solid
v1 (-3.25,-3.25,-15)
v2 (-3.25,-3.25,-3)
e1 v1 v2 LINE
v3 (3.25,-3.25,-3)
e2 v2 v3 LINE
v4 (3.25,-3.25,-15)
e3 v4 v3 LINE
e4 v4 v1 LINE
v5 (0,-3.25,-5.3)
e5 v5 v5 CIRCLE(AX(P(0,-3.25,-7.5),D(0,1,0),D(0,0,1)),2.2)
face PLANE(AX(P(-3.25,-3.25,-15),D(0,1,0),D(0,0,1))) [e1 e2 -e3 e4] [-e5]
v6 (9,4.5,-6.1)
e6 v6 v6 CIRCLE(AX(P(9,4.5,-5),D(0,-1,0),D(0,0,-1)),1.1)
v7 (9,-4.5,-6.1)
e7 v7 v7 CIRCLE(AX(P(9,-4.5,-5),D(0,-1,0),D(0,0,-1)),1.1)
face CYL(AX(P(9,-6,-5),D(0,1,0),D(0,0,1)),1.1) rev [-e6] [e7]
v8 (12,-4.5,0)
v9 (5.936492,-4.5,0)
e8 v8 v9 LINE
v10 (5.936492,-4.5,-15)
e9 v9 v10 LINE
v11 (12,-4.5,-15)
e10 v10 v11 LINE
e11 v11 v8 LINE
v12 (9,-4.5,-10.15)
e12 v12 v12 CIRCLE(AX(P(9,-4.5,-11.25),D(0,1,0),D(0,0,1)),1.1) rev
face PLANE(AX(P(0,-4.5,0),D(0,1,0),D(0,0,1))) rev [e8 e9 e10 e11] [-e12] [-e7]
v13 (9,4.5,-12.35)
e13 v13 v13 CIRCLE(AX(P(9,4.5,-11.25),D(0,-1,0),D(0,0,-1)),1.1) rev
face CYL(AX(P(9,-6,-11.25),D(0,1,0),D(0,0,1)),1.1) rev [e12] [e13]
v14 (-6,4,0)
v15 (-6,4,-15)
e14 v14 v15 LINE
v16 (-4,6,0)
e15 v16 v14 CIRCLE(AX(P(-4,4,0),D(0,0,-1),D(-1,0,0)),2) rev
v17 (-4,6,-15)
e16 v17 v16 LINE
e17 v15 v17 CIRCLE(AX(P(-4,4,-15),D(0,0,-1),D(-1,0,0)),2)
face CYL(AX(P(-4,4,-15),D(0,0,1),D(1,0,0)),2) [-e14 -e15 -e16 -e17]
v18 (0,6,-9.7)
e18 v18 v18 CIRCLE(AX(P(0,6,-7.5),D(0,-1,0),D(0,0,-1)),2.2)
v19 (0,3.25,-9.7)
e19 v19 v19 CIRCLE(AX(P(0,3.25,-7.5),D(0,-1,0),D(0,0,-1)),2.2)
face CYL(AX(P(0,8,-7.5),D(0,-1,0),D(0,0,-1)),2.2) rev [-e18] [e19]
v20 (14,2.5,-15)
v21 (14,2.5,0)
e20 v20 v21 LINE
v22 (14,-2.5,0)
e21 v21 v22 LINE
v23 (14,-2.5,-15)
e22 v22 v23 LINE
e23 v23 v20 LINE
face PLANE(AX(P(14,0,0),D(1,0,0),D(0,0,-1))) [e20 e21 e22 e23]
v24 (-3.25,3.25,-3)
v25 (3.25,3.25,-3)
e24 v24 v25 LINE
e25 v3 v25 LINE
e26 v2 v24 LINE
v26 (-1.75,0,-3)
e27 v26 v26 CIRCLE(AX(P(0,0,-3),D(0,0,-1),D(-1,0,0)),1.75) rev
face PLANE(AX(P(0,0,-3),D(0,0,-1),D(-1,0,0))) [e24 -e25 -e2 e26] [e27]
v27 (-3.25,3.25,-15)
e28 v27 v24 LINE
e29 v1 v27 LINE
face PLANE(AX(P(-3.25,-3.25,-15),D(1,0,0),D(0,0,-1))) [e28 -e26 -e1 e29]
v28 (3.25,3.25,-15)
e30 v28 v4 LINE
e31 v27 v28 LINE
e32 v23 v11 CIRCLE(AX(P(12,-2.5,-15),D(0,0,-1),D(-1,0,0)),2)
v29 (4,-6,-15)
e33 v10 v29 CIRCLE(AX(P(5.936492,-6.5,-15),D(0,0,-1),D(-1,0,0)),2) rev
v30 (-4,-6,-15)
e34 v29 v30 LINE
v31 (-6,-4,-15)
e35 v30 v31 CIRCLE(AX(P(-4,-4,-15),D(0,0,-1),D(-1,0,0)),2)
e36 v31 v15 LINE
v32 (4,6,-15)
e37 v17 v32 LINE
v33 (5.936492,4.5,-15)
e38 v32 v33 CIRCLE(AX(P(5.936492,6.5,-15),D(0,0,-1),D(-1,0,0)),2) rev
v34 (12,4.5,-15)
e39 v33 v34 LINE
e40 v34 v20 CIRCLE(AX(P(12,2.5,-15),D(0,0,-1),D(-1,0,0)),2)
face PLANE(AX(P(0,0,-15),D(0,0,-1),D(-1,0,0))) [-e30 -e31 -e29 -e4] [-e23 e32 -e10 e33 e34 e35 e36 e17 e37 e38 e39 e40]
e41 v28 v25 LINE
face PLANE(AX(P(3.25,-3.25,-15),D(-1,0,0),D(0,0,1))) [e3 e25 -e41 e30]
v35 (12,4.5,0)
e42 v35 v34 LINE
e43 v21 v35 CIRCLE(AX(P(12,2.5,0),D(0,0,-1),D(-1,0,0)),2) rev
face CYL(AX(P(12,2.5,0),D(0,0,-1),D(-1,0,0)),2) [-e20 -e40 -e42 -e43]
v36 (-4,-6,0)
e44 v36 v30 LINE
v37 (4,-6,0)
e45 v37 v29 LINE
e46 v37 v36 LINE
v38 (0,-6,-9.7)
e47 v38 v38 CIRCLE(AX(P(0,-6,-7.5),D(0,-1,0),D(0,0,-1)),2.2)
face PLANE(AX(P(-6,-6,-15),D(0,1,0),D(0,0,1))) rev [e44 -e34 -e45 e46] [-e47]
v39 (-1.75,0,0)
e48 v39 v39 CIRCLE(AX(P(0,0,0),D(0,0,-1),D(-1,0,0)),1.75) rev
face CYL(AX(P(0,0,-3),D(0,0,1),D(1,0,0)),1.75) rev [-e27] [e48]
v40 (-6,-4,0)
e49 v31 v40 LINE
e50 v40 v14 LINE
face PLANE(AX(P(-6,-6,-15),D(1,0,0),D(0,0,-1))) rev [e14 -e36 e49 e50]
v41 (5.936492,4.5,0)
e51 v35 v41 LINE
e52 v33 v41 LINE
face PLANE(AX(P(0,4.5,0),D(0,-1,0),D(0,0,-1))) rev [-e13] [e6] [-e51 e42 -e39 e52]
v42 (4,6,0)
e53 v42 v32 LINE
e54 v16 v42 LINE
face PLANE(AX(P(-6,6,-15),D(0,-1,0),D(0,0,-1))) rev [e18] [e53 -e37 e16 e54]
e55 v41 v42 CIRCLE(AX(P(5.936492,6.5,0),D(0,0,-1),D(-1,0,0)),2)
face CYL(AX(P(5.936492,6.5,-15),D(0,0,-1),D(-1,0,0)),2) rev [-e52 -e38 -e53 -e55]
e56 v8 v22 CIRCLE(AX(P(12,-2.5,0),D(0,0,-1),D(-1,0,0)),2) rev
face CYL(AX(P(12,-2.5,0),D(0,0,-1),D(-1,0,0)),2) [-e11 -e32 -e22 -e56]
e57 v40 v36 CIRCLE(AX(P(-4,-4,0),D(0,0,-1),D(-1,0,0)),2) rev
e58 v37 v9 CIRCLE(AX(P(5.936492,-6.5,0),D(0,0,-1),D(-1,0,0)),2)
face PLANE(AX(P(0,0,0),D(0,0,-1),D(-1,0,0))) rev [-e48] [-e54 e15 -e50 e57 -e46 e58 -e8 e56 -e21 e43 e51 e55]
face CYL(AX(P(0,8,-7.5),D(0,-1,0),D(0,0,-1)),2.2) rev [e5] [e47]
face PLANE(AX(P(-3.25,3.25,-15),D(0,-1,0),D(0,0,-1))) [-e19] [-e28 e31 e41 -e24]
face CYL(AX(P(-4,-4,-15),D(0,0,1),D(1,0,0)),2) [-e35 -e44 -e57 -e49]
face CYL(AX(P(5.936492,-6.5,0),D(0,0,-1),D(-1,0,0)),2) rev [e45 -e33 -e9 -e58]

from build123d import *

# Parameters (mm, degrees)
SKETCH1_R               = 4.5
SKETCH1_R_2             = 1.25
BOSS_EXTRUDE1_DEPTH     = 8
SKETCH2_R               = 1.75
SKETCH2_R_2             = 1.25
CUT_EXTRUDE1_DEPTH      = 4
SKETCH4_W               = 12
SKETCH4_H               = 12
SKETCH4_W_2             = 6.5
SKETCH4_H_2             = 6.5
BOSS_EXTRUDE2_DEPTH     = 15
SKETCH5_W               = 15
SKETCH5_H               = 12
BOSS_EXTRUDE3_DEPTH     = 8
CUT_EXTRUDE2_DEPTH      = 24.769728648
CUT_EXTRUDE2_DEPTH_BACK = 24.769728648
SKETCH6_R               = 1.1
FILLET1_R               = 2
CUT_EXTRUDE3_START      = -1.5
SKETCH7_W               = 10
SKETCH7_H               = 15
SKETCH7_R               = 1.1
CUT_EXTRUDE3_DEPTH      = 1.5
CUT_EXTRUDE4_START      = -12
SKETCH7_2_W             = 10
SKETCH7_2_H             = 15
SKETCH7_2_R             = 1.1
CUT_EXTRUDE4_DEPTH      = 1.5
FILLET2_R               = 2
SKETCH1_2_R             = 4.5
SKETCH1_2_R_2           = 1.25
CUT_EXTRUDE5_DEPTH      = 8
BOSS_EXTRUDE5_OUTLINE_W = 6.5
BOSS_EXTRUDE5_OUTLINE_H = 6.5
BOSS_EXTRUDE5_OUTLINE_R = 1.75
BOSS_EXTRUDE5_DEPTH     = 3
SKETCH8_R               = 2.2
CUT_EXTRUDE6_DEPTH      = 14


with BuildPart() as part:
    # Sketch1 → Boss-Extrude1 (new body)
    with BuildSketch(Plane.XY):
        Circle(SKETCH1_R)
        Circle(SKETCH1_R_2, mode=Mode.SUBTRACT)
    extrude(amount=BOSS_EXTRUDE1_DEPTH)

    # Sketch2 → Cut-Extrude1 (cut)
    with BuildSketch(Plane(origin=(0, 0, 0), x_dir=(-1, 0, 0), z_dir=(0, 0, -1))):
        Circle(SKETCH2_R)
        Circle(SKETCH2_R_2, mode=Mode.SUBTRACT)
    extrude(amount=-CUT_EXTRUDE1_DEPTH, mode=Mode.SUBTRACT)

    # Sketch4 → Boss-Extrude2 (add)
    with BuildSketch(Plane(origin=(0, 0, 0), x_dir=(-1, 0, 0), z_dir=(0, 0, -1))):
        Rectangle(SKETCH4_W, SKETCH4_H)
        Rectangle(SKETCH4_W_2, SKETCH4_H_2, mode=Mode.SUBTRACT)
    extrude(amount=BOSS_EXTRUDE2_DEPTH)

    # Sketch5 → Boss-Extrude3 (add)
    with BuildSketch(Plane(origin=(6, 0, 0), x_dir=(0, 0, -1), z_dir=(1, 0, 0))):
        with Locations((7.5, 0)):
            Rectangle(SKETCH5_W, SKETCH5_H)
    extrude(amount=BOSS_EXTRUDE3_DEPTH)

    # Sketch6 → Cut-Extrude2 (cut, two sides: drawn at the far end of the back side and taken through both)
    with BuildSketch(Plane(origin=(0, 6, 0), x_dir=(1, 0, 0), z_dir=(0, 1, 0)).offset(-CUT_EXTRUDE2_DEPTH_BACK)):
        with Locations(Location((9, 11.25, 0), (0, 0, 270))):
            Circle(SKETCH6_R)
        with Locations(Location((9, 5, 0), (0, 0, 270))):
            Circle(SKETCH6_R)
    extrude(amount=CUT_EXTRUDE2_DEPTH + CUT_EXTRUDE2_DEPTH_BACK, mode=Mode.SUBTRACT)

    # Fillet1
    fillet1_edges = [part.edges().sort_by_distance(p)[0] for p in [
        (-6, -6, -7.5),
        (-6, 6, -7.5),
    ]]
    fillet(fillet1_edges, radius=FILLET1_R)

    # Sketch7 → Cut-Extrude3 (cut)
    with BuildSketch(Plane.XZ.offset(6).offset(CUT_EXTRUDE3_START)):
        with Locations((9, -7.5)):
            Rectangle(SKETCH7_W, SKETCH7_H)
        with Locations(Location((9, -5, 0), (0, 0, 270))):
            Circle(SKETCH7_R, mode=Mode.SUBTRACT)
    extrude(amount=CUT_EXTRUDE3_DEPTH, mode=Mode.SUBTRACT)

    # Sketch7<2> → Cut-Extrude4 (cut)
    with BuildSketch(Plane.XZ.offset(6).offset(CUT_EXTRUDE4_START)):
        with Locations((9, -7.5)):
            Rectangle(SKETCH7_2_W, SKETCH7_2_H)
        with Locations(Location((9, -5, 0), (0, 0, 270))):
            Circle(SKETCH7_2_R, mode=Mode.SUBTRACT)
    extrude(amount=CUT_EXTRUDE4_DEPTH, mode=Mode.SUBTRACT)

    # Fillet2
    # the kernel refuses this fillet: 2 mm, written as the material it adds along each edge
    with BuildSketch(Plane(origin=(4, 4.5, 0), x_dir=(1, 0, 0), z_dir=(0, 0, -1))) as fillet2_piece_1:
        with BuildLine():
            CenterArc((1.936491673, -2), FILLET2_R, 90, 75.522487814)
            Line((0, -1.5), (0, 0))
            Line((0, 0), (1.936491673, 0))
        make_face()
    extrude(amount=15)
    with BuildSketch(Plane(origin=(4, -4.5, 0), x_dir=(0, -1, 0), z_dir=(0, 0, -1))) as fillet2_piece_2:
        with BuildLine():
            CenterArc((2, -1.936491673), FILLET2_R, 104.477512186, 75.522487814)
            Line((0, -1.936491673), (0, 0))
            Line((0, 0), (1.5, 0))
        make_face()
    extrude(amount=15)
    # the kernel refuses this fillet: 2 mm, written as the material it takes off along each edge
    with BuildSketch(Plane(origin=(14, -4.5, -20), x_dir=(0, 1, 0), z_dir=(0, 0, 1)), Plane(origin=(14, 4.5, -20), x_dir=(-1, 0, 0), z_dir=(0, 0, 1))) as fillet2_2_piece_1:
        with BuildLine():
            CenterArc((FILLET2_R, FILLET2_R), FILLET2_R, 180, 90)
            Line((0, FILLET2_R), (0, 0))
            Line((0, 0), (FILLET2_R, 0))
        make_face()
    extrude(amount=25, mode=Mode.SUBTRACT)

    # Sketch1<2> → Cut-Extrude5 (cut)
    with BuildSketch(Plane.XY):
        Circle(SKETCH1_2_R)
        Circle(SKETCH1_2_R_2, mode=Mode.SUBTRACT)
    extrude(amount=CUT_EXTRUDE5_DEPTH, mode=Mode.SUBTRACT)

    # Boss-Extrude5: read off the stored shape, not the designer's step
    # Boss-Extrude5 outline → Boss-Extrude5 (add)
    with BuildSketch(Plane(origin=(0, 0, 0), x_dir=(-1, 0, 0), z_dir=(0, 0, -1))):
        Rectangle(BOSS_EXTRUDE5_OUTLINE_W, BOSS_EXTRUDE5_OUTLINE_H)
        Circle(BOSS_EXTRUDE5_OUTLINE_R, mode=Mode.SUBTRACT)
    extrude(amount=BOSS_EXTRUDE5_DEPTH)

    # Sketch8 → Cut-Extrude6 (cut)
    with BuildSketch(Plane.XZ.offset(6)):
        with Locations(Location((0, -7.5, 0), (0, 0, 270))):
            Circle(SKETCH8_R)
    extrude(amount=-CUT_EXTRUDE6_DEPTH, mode=Mode.SUBTRACT)


solid = part.part
